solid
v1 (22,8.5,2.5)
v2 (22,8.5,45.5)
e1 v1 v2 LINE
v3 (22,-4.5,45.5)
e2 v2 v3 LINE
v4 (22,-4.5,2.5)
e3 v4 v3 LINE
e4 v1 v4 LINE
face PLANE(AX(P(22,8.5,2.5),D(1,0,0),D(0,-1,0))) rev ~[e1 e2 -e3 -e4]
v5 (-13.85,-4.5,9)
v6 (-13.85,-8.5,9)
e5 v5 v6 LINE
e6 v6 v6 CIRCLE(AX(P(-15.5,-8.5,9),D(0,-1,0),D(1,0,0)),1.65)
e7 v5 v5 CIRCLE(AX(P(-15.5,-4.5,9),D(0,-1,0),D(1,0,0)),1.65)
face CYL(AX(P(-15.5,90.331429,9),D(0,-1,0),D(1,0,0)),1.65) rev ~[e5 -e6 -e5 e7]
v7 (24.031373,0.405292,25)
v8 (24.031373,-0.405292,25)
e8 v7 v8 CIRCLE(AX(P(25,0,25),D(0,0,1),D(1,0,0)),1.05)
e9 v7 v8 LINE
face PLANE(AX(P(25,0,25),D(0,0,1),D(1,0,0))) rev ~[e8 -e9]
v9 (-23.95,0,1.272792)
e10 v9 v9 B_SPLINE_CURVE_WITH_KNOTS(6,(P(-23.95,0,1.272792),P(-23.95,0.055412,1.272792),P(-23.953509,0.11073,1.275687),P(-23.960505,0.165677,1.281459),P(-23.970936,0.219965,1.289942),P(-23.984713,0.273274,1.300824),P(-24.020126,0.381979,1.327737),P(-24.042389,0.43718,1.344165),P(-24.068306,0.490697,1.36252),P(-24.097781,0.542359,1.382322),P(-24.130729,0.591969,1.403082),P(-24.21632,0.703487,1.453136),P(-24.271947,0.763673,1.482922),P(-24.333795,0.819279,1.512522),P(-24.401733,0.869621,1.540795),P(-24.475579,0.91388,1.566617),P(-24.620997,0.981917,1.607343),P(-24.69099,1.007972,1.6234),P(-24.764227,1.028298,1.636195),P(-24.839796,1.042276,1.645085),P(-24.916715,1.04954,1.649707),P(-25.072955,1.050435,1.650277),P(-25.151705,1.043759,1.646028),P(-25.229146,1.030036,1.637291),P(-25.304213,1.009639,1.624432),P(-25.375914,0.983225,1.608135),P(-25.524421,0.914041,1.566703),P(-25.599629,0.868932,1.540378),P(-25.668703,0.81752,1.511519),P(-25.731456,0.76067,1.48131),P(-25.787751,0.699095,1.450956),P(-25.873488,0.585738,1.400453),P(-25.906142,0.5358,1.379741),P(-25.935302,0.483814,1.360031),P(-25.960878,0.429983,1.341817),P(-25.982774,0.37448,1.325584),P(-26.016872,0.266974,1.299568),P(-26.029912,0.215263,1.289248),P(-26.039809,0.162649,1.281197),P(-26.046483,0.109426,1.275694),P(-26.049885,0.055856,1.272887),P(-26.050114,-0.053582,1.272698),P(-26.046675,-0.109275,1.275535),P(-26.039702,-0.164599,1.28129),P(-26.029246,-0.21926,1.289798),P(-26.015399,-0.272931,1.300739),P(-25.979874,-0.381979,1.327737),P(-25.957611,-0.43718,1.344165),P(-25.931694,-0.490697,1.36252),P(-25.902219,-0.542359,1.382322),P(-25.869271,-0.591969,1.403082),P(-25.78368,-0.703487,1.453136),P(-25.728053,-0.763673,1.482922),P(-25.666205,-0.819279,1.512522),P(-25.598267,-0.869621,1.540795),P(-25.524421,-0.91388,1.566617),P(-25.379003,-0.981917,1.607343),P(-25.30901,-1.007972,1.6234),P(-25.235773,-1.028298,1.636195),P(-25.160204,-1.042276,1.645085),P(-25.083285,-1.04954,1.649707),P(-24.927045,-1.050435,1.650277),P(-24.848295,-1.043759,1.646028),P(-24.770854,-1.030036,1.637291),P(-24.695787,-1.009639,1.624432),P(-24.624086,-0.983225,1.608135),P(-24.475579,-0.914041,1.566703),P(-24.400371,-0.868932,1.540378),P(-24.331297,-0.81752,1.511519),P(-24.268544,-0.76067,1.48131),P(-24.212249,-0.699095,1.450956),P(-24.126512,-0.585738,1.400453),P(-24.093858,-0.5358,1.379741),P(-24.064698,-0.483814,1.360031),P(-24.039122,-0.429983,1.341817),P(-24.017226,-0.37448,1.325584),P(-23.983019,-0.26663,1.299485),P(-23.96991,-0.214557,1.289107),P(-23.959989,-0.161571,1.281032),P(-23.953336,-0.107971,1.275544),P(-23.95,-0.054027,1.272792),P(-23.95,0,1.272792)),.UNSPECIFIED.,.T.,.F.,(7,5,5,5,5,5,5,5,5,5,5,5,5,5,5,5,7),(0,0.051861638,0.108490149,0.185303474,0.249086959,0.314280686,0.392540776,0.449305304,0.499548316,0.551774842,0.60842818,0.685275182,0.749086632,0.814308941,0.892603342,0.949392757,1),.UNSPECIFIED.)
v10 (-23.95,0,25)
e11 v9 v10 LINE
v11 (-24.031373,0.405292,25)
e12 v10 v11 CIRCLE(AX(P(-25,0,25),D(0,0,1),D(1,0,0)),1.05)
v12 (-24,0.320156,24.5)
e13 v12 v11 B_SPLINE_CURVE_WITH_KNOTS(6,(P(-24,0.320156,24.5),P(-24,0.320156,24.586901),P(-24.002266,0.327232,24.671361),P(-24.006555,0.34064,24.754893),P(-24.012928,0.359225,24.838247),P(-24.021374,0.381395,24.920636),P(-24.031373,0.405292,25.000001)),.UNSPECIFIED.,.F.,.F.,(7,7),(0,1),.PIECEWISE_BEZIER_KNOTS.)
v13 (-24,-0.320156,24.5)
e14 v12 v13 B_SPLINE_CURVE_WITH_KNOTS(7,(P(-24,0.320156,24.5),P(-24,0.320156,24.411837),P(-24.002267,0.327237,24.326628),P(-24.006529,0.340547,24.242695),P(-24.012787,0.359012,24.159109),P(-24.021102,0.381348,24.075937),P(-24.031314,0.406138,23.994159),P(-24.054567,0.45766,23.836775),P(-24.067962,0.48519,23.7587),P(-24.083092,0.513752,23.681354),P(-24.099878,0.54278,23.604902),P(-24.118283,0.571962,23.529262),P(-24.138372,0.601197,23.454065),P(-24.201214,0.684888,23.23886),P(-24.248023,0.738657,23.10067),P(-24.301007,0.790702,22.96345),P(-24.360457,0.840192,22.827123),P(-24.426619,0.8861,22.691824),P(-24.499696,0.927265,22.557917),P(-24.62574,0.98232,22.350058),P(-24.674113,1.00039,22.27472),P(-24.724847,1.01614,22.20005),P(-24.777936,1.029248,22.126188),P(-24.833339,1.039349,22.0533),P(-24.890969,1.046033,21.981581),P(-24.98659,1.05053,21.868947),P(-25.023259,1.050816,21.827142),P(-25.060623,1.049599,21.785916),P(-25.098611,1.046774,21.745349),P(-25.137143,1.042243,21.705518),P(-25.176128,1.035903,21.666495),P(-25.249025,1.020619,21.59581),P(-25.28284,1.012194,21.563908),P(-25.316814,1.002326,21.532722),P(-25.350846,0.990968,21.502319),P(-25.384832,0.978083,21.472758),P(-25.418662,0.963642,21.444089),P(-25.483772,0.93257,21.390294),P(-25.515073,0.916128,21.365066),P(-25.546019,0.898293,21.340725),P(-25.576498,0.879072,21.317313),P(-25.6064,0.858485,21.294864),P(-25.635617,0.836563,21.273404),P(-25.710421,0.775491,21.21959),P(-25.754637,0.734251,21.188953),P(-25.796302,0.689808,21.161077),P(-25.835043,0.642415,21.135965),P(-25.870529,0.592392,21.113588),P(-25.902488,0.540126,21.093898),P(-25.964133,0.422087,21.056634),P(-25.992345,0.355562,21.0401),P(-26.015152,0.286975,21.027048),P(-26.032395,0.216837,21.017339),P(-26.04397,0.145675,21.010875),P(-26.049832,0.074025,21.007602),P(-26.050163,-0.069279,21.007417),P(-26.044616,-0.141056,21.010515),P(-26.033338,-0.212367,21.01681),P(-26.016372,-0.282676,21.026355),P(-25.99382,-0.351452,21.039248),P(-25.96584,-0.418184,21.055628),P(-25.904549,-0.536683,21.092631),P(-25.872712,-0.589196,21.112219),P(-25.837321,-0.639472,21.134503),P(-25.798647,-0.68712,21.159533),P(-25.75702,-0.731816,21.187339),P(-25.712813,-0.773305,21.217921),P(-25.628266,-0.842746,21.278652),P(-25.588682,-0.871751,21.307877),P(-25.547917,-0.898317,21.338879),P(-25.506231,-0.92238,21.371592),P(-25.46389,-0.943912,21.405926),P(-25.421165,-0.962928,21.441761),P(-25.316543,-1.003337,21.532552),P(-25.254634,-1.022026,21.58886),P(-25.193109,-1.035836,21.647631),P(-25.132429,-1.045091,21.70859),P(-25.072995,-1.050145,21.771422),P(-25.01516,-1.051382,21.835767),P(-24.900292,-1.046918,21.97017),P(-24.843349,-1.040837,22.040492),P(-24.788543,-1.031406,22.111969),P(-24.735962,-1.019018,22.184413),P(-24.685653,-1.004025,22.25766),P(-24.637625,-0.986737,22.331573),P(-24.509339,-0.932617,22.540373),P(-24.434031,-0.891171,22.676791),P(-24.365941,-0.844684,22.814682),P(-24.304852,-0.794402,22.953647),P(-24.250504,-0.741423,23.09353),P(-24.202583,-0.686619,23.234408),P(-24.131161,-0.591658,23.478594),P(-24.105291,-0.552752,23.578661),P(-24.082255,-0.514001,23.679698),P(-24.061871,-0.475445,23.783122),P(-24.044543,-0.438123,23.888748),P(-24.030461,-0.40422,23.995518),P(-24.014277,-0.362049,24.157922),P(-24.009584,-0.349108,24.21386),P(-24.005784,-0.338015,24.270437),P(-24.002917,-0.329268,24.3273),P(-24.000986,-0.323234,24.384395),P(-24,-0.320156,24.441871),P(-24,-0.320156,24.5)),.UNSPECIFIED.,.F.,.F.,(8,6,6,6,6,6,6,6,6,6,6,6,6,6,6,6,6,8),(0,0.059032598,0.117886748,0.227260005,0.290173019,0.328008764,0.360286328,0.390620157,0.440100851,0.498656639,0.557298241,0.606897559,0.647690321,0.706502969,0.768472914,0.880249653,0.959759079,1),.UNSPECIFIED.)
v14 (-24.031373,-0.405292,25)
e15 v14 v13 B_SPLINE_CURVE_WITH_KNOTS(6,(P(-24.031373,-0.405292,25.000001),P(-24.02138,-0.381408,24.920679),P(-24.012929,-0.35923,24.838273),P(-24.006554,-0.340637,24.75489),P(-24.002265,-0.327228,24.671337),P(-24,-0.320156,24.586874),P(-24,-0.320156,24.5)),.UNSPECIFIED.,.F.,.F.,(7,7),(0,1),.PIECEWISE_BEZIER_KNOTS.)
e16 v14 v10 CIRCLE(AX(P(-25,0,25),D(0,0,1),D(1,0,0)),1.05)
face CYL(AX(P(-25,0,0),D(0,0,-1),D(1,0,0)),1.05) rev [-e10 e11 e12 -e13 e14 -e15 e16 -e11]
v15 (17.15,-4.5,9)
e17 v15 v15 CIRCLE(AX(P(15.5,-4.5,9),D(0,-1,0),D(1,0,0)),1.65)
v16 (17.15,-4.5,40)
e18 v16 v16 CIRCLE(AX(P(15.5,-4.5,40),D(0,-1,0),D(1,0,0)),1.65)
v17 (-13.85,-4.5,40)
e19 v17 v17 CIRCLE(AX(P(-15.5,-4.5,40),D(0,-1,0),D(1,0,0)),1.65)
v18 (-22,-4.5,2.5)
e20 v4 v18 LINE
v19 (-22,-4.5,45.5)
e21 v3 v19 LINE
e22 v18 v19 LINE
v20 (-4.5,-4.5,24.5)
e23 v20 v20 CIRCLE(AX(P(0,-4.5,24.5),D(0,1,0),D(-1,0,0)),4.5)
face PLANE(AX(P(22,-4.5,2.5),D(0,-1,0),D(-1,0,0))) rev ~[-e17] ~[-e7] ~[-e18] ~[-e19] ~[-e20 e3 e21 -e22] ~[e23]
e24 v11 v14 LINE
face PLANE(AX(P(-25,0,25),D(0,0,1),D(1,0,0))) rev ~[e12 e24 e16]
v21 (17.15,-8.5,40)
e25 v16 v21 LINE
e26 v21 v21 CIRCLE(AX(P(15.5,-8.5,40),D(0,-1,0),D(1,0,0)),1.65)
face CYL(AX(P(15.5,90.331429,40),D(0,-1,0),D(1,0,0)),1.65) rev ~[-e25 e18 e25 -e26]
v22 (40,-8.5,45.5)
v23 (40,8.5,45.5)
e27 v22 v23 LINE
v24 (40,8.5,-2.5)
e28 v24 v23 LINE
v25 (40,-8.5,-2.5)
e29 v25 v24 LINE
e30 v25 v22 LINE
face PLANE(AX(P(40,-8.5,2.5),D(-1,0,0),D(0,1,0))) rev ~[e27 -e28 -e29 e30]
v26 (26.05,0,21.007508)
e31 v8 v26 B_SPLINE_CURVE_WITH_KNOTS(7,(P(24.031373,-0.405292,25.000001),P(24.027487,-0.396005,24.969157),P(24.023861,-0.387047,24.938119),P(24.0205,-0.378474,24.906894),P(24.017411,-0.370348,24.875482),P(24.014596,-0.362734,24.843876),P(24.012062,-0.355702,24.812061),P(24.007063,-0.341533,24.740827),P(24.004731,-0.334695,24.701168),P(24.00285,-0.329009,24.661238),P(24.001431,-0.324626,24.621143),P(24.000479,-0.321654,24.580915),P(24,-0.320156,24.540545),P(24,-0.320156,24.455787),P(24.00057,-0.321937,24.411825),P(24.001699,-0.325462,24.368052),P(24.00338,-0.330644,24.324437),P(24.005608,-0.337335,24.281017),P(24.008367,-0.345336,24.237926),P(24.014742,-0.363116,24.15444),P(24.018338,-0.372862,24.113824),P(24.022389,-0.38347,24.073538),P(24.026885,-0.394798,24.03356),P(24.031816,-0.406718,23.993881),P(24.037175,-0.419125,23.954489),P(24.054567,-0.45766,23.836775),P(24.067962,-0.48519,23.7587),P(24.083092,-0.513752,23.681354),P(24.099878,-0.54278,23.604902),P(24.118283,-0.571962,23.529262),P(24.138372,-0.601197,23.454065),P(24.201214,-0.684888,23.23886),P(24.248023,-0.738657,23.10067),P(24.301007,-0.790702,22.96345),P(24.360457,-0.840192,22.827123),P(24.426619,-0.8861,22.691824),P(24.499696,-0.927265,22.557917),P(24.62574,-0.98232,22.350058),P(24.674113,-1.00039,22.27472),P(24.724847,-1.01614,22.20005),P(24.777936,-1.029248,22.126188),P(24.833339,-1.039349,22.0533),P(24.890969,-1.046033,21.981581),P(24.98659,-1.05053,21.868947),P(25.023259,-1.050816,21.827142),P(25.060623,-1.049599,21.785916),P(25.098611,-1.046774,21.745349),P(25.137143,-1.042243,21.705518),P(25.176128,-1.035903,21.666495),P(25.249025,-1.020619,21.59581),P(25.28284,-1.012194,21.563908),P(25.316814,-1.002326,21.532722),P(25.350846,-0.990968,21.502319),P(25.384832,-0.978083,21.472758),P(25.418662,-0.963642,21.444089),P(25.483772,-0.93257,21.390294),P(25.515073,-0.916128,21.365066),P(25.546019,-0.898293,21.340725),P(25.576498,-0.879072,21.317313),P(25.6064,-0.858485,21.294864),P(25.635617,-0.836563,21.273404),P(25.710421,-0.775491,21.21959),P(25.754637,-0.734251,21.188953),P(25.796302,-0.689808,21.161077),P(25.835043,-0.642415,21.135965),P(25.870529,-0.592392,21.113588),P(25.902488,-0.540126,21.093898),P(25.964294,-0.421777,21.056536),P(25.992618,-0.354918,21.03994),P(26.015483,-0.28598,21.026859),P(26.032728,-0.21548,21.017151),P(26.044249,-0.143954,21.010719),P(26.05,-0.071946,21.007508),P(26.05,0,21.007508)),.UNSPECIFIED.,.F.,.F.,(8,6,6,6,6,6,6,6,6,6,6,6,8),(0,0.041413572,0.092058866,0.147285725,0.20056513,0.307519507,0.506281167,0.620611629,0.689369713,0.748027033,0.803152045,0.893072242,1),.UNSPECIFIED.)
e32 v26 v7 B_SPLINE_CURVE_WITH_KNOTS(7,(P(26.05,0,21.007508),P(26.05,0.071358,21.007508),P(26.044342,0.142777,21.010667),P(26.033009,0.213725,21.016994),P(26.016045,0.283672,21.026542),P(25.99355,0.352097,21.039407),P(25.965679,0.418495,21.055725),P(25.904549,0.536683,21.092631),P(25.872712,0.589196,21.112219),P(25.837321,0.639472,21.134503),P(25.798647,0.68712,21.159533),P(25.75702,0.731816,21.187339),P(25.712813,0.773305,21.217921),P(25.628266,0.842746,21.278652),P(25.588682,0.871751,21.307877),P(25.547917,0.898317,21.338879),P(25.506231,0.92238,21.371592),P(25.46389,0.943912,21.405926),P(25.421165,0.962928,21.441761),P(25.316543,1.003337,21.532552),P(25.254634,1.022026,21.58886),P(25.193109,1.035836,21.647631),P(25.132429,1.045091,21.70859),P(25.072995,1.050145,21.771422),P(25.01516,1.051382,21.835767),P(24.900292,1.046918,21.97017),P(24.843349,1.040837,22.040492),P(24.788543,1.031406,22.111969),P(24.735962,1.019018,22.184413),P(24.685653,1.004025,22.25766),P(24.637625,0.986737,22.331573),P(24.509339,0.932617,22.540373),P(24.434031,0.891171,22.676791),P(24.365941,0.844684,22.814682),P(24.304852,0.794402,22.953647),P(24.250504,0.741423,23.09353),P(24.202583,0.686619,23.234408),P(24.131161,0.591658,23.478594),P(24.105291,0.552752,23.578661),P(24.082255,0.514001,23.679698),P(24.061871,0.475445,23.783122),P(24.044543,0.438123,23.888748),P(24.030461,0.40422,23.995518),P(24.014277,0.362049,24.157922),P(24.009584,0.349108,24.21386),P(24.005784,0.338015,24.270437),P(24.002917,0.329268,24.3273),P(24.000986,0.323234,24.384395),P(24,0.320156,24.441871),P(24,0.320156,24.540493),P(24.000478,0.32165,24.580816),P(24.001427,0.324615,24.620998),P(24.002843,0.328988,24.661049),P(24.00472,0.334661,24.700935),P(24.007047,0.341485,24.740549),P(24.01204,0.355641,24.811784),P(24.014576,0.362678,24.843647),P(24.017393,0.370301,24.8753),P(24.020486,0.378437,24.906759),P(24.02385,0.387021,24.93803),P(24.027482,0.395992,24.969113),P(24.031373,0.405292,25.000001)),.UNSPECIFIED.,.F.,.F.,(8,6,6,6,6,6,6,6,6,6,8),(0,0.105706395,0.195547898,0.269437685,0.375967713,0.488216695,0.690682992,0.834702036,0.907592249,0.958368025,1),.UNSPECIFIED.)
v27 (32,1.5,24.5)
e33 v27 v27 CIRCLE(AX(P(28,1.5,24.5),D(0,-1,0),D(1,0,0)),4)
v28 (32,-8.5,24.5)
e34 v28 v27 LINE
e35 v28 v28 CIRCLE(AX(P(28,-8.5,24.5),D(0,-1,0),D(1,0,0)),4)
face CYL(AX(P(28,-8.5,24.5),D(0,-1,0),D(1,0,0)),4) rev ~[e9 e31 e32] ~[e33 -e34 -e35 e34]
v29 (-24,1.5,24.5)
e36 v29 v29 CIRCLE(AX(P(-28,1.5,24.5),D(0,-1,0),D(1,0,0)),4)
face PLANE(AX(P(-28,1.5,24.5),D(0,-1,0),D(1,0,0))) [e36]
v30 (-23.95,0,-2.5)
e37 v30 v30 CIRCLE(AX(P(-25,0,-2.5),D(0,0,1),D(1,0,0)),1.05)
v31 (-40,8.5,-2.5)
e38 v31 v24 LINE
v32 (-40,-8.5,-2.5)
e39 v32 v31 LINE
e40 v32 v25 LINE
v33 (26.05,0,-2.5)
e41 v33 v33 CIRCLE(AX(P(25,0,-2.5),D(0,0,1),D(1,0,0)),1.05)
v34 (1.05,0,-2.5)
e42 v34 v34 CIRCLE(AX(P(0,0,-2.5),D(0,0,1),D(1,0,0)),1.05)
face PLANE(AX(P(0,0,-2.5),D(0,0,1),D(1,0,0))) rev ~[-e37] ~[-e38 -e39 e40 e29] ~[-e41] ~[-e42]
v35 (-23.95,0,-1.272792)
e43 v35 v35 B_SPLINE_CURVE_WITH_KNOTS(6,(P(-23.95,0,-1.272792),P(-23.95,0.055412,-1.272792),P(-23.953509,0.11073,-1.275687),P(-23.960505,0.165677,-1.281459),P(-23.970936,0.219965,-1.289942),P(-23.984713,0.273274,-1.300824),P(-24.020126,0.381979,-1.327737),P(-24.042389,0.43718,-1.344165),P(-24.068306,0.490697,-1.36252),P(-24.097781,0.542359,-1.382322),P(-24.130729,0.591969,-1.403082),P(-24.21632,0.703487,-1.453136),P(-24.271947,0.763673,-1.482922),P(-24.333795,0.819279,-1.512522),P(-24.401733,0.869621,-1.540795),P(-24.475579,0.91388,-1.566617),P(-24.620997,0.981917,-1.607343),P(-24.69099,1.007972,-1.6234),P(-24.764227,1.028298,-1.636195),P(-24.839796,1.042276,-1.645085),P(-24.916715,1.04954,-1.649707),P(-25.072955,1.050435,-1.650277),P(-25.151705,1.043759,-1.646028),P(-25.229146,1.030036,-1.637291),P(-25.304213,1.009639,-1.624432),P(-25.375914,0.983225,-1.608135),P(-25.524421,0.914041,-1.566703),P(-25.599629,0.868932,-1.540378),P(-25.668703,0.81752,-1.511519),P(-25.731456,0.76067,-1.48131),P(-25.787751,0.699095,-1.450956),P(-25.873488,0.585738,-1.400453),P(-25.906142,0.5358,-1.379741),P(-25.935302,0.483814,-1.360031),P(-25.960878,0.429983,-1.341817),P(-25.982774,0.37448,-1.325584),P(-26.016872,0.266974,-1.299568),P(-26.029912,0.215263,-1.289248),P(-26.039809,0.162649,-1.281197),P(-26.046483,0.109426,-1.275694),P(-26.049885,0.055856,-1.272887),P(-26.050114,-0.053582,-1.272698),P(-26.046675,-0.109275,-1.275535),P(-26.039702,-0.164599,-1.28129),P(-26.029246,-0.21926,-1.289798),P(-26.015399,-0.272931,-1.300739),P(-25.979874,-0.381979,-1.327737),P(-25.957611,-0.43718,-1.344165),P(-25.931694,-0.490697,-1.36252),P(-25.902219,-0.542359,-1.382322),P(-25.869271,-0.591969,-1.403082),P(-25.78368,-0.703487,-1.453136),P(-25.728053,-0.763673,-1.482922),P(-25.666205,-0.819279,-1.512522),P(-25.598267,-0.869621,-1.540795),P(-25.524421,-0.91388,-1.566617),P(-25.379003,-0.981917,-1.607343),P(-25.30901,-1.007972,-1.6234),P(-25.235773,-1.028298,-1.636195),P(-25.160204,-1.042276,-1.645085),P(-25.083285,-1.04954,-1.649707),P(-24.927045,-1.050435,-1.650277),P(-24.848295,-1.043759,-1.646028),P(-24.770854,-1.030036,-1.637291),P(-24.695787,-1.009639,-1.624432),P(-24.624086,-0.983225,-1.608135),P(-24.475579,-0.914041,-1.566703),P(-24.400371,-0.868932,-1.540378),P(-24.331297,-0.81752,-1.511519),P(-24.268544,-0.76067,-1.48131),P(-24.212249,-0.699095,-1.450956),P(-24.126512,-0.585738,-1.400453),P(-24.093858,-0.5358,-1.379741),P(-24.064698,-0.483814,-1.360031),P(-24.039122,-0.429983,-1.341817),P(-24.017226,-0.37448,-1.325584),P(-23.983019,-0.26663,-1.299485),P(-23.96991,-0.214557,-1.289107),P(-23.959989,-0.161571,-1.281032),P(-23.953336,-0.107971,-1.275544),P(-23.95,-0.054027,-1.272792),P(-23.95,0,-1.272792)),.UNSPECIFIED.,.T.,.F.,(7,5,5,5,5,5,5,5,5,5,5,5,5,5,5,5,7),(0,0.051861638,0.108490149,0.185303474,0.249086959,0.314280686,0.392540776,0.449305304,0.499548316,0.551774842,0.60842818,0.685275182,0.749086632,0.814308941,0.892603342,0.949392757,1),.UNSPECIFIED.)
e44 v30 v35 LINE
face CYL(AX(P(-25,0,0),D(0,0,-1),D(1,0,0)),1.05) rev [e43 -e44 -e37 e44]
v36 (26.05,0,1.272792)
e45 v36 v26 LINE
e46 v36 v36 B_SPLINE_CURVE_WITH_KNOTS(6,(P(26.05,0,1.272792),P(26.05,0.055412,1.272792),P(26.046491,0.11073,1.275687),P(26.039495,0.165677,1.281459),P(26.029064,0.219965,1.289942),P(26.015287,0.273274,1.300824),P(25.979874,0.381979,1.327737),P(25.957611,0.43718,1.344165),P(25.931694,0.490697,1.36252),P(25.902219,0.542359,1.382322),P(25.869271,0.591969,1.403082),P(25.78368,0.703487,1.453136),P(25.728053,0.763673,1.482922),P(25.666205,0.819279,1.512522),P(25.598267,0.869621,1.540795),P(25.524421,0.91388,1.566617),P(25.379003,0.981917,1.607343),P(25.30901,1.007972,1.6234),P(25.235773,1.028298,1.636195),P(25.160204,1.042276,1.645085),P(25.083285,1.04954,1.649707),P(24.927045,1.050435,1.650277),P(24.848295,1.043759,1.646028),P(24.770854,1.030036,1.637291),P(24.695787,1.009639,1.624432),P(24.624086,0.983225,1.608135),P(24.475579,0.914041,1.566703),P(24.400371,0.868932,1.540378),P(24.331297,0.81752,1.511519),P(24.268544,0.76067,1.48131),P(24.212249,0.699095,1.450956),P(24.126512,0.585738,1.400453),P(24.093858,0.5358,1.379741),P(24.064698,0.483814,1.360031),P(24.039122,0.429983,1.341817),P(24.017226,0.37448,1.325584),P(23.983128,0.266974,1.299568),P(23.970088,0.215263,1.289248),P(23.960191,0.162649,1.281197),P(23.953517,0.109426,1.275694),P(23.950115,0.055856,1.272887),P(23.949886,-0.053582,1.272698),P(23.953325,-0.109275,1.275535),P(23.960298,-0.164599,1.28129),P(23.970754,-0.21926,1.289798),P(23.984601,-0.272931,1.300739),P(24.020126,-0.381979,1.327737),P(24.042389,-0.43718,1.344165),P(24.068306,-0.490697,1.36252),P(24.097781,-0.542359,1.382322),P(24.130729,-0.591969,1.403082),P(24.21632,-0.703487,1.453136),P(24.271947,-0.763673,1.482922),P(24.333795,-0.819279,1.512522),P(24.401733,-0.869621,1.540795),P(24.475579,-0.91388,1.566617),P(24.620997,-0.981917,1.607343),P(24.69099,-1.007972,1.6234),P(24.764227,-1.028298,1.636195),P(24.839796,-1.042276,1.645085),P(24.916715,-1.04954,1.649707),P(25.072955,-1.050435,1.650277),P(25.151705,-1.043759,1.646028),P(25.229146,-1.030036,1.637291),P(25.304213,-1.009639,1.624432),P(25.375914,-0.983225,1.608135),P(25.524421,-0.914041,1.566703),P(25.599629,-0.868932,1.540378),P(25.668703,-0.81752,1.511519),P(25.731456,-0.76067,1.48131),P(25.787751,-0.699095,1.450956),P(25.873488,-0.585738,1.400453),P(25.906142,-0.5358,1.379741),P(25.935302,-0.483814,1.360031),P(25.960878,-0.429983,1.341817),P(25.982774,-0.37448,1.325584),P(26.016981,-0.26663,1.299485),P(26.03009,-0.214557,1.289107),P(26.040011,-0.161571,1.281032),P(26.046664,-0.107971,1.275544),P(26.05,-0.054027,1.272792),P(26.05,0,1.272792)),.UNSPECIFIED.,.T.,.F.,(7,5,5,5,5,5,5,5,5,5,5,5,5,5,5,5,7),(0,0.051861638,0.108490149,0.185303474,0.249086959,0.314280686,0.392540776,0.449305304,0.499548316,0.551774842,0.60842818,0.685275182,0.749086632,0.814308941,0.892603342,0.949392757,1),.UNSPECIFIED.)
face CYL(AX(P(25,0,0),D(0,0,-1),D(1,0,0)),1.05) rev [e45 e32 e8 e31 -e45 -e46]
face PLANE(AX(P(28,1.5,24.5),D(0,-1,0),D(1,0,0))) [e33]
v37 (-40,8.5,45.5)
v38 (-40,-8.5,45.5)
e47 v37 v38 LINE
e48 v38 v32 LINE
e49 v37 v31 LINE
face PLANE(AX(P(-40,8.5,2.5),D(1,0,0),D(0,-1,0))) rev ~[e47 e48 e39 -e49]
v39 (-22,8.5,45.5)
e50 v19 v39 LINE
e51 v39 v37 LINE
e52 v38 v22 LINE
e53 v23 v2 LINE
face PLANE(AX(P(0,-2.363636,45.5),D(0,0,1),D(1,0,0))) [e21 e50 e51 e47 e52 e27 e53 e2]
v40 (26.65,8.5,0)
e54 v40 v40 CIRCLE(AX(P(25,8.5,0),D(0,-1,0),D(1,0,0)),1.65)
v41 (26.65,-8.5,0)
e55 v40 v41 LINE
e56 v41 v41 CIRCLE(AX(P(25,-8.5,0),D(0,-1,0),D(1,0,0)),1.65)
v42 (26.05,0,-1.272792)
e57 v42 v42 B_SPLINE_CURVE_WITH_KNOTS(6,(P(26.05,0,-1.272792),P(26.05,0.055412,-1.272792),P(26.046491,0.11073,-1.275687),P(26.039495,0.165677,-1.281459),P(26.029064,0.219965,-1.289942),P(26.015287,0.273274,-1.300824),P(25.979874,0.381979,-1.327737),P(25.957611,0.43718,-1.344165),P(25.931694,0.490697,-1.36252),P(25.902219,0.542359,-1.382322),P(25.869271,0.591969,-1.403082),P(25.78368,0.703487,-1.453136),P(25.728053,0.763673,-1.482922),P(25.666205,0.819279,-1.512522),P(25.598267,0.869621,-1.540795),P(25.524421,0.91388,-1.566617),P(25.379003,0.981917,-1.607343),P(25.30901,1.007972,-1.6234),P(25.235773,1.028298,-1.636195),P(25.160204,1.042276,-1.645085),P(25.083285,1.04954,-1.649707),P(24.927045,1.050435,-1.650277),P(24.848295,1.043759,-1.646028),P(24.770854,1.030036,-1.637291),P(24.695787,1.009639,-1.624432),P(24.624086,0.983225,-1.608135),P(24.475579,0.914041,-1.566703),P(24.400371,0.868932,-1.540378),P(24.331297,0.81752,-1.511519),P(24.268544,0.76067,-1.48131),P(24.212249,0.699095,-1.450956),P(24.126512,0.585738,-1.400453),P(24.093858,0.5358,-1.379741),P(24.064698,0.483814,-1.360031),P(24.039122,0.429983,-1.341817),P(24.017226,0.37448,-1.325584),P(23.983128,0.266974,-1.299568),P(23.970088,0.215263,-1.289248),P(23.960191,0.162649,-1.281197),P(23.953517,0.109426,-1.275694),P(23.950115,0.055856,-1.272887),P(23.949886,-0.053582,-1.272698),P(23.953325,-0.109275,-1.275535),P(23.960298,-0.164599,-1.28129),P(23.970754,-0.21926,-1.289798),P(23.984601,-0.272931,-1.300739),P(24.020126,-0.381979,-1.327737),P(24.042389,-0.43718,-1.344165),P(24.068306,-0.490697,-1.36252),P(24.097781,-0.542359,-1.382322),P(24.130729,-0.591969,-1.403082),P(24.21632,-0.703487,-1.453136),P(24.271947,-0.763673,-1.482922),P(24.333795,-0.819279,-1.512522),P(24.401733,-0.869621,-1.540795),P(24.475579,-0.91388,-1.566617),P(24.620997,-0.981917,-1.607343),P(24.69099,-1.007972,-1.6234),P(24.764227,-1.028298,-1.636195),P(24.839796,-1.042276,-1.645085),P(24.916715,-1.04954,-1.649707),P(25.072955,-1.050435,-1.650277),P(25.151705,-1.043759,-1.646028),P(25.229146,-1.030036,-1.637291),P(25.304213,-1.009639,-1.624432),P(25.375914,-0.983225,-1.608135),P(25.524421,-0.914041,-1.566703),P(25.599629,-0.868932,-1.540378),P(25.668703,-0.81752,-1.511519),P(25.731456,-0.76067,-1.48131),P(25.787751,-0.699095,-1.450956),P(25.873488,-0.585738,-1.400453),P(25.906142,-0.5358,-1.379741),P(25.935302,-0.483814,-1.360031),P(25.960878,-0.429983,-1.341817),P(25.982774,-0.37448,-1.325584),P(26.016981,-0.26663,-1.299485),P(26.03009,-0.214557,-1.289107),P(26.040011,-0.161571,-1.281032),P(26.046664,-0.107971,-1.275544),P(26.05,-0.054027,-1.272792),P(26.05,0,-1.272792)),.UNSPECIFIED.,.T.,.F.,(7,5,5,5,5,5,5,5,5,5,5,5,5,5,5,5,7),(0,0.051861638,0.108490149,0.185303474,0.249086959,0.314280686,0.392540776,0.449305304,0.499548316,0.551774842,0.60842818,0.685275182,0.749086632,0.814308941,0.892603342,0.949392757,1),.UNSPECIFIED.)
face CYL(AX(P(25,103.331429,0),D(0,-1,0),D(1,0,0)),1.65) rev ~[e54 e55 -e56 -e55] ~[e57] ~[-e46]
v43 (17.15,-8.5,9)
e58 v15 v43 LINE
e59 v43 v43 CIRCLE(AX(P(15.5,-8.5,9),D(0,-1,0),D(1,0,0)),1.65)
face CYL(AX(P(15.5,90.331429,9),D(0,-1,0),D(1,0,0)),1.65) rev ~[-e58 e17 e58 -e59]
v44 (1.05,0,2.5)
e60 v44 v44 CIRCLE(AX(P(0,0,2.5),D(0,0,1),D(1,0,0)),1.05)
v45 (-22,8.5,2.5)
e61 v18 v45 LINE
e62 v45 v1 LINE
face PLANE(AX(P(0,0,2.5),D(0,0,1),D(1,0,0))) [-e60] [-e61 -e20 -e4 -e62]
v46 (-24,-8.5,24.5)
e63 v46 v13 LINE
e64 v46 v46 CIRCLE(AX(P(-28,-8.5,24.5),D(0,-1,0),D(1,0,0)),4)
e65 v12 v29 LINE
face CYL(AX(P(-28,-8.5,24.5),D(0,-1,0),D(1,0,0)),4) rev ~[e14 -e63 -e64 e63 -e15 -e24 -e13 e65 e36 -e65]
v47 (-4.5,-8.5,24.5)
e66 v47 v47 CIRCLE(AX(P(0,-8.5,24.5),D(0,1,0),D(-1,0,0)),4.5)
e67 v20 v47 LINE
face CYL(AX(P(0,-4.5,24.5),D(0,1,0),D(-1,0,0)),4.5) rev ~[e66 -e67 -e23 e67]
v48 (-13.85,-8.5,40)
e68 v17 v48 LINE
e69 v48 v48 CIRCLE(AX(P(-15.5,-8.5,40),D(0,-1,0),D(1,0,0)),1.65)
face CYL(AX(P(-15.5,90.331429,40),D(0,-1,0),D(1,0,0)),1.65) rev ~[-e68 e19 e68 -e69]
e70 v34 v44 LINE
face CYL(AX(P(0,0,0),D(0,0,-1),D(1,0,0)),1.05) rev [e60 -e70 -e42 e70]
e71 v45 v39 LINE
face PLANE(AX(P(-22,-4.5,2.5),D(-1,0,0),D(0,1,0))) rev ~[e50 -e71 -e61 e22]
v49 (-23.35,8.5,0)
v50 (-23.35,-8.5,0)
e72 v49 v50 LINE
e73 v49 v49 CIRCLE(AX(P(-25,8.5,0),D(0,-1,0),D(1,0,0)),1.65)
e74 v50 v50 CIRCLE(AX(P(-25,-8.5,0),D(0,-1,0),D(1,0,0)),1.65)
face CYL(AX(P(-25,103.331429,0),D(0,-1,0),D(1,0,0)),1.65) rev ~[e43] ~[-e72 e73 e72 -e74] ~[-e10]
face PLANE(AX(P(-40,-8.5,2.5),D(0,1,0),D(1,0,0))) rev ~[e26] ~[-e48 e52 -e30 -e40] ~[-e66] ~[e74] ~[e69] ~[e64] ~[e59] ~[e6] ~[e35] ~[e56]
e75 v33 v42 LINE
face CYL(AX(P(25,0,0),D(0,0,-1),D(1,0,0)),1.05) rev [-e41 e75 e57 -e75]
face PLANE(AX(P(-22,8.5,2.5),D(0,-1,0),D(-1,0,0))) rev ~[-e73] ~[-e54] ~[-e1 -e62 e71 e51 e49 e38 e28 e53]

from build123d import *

# Parameters (mm, degrees)
F0_W      = 80
F0_H      = 17
F0_R      = 1.05
F1_DEPTH  = 2.5
F3_DEPTH  = 43
F5_DEPTH  = 25
F7_D      = 3.3
F8_D      = 3.3
F4_R      = 4.5
F9_DEPTH  = 4.0010001
F10_R     = 4
F11_DEPTH = 10


# Not quite as in the source:
# - a feature names something its author has since deleted; it is built from what else it names


with BuildPart() as f1:
    # F0 (on Top) → F1 (new body, symmetric)
    with BuildSketch(Plane.XY):
        Rectangle(F0_W, F0_H)
        with Locations((-25, 0)):
            Circle(F0_R, mode=Mode.SUBTRACT)
        Circle(F0_R, mode=Mode.SUBTRACT)
        with Locations((25, 0)):
            Circle(F0_R, mode=Mode.SUBTRACT)
    extrude(amount=F1_DEPTH, both=True)

    # F2 (on face) → F3 (join)
    with BuildSketch(Plane.XY.offset(2.5)):
        Polygon((-40, -8.5), (40, -8.5), (40, 8.5), (22, 8.5), (22, -4.5), (-22, -4.5), (-22, 8.5), (-40, 8.5), align=None)
    extrude(amount=F3_DEPTH)

    # F0 (on Top) → F5 (cut)
    with BuildSketch(Plane.XY):
        with Locations((-25, 0)):
            Circle(F0_R)
        Circle(F0_R)
        with Locations((25, 0)):
            Circle(F0_R)
    extrude(amount=F5_DEPTH, mode=Mode.SUBTRACT)

    # F7 (through all)
    with Locations(Plane(origin=(0, 8.5, 0), x_dir=(-1, 0, 0), z_dir=(0, 1, 0))):
        with Locations((25, 0), (-25, 0)):
            Hole(F7_D / 2)

    # F8 (through all)
    with Locations(Plane(origin=(0, -4.5, 0), x_dir=(-1, 0, 0), z_dir=(0, 1, 0))):
        with Locations((15.5, 40), (-15.5, 40), (-15.5, 9), (15.5, 9)):
            Hole(F8_D / 2)

    # F4 (on face) → F9 (cut, through all)
    with BuildSketch(Plane(origin=(0, -4.5, 0), x_dir=(-1, 0, 0), z_dir=(0, 1, 0))):
        with Locations((0, 24.5)):
            Circle(F4_R)
    extrude(amount=-F9_DEPTH, mode=Mode.SUBTRACT)

    # F10 (on face) → F11 (cut)
    with BuildSketch(Plane.XZ.offset(8.5)):
        with Locations((-28, 24.5)):
            Circle(F10_R)
        with Locations((28, 24.5)):
            Circle(F10_R)
    extrude(amount=-F11_DEPTH, mode=Mode.SUBTRACT)


solid = f1.part
